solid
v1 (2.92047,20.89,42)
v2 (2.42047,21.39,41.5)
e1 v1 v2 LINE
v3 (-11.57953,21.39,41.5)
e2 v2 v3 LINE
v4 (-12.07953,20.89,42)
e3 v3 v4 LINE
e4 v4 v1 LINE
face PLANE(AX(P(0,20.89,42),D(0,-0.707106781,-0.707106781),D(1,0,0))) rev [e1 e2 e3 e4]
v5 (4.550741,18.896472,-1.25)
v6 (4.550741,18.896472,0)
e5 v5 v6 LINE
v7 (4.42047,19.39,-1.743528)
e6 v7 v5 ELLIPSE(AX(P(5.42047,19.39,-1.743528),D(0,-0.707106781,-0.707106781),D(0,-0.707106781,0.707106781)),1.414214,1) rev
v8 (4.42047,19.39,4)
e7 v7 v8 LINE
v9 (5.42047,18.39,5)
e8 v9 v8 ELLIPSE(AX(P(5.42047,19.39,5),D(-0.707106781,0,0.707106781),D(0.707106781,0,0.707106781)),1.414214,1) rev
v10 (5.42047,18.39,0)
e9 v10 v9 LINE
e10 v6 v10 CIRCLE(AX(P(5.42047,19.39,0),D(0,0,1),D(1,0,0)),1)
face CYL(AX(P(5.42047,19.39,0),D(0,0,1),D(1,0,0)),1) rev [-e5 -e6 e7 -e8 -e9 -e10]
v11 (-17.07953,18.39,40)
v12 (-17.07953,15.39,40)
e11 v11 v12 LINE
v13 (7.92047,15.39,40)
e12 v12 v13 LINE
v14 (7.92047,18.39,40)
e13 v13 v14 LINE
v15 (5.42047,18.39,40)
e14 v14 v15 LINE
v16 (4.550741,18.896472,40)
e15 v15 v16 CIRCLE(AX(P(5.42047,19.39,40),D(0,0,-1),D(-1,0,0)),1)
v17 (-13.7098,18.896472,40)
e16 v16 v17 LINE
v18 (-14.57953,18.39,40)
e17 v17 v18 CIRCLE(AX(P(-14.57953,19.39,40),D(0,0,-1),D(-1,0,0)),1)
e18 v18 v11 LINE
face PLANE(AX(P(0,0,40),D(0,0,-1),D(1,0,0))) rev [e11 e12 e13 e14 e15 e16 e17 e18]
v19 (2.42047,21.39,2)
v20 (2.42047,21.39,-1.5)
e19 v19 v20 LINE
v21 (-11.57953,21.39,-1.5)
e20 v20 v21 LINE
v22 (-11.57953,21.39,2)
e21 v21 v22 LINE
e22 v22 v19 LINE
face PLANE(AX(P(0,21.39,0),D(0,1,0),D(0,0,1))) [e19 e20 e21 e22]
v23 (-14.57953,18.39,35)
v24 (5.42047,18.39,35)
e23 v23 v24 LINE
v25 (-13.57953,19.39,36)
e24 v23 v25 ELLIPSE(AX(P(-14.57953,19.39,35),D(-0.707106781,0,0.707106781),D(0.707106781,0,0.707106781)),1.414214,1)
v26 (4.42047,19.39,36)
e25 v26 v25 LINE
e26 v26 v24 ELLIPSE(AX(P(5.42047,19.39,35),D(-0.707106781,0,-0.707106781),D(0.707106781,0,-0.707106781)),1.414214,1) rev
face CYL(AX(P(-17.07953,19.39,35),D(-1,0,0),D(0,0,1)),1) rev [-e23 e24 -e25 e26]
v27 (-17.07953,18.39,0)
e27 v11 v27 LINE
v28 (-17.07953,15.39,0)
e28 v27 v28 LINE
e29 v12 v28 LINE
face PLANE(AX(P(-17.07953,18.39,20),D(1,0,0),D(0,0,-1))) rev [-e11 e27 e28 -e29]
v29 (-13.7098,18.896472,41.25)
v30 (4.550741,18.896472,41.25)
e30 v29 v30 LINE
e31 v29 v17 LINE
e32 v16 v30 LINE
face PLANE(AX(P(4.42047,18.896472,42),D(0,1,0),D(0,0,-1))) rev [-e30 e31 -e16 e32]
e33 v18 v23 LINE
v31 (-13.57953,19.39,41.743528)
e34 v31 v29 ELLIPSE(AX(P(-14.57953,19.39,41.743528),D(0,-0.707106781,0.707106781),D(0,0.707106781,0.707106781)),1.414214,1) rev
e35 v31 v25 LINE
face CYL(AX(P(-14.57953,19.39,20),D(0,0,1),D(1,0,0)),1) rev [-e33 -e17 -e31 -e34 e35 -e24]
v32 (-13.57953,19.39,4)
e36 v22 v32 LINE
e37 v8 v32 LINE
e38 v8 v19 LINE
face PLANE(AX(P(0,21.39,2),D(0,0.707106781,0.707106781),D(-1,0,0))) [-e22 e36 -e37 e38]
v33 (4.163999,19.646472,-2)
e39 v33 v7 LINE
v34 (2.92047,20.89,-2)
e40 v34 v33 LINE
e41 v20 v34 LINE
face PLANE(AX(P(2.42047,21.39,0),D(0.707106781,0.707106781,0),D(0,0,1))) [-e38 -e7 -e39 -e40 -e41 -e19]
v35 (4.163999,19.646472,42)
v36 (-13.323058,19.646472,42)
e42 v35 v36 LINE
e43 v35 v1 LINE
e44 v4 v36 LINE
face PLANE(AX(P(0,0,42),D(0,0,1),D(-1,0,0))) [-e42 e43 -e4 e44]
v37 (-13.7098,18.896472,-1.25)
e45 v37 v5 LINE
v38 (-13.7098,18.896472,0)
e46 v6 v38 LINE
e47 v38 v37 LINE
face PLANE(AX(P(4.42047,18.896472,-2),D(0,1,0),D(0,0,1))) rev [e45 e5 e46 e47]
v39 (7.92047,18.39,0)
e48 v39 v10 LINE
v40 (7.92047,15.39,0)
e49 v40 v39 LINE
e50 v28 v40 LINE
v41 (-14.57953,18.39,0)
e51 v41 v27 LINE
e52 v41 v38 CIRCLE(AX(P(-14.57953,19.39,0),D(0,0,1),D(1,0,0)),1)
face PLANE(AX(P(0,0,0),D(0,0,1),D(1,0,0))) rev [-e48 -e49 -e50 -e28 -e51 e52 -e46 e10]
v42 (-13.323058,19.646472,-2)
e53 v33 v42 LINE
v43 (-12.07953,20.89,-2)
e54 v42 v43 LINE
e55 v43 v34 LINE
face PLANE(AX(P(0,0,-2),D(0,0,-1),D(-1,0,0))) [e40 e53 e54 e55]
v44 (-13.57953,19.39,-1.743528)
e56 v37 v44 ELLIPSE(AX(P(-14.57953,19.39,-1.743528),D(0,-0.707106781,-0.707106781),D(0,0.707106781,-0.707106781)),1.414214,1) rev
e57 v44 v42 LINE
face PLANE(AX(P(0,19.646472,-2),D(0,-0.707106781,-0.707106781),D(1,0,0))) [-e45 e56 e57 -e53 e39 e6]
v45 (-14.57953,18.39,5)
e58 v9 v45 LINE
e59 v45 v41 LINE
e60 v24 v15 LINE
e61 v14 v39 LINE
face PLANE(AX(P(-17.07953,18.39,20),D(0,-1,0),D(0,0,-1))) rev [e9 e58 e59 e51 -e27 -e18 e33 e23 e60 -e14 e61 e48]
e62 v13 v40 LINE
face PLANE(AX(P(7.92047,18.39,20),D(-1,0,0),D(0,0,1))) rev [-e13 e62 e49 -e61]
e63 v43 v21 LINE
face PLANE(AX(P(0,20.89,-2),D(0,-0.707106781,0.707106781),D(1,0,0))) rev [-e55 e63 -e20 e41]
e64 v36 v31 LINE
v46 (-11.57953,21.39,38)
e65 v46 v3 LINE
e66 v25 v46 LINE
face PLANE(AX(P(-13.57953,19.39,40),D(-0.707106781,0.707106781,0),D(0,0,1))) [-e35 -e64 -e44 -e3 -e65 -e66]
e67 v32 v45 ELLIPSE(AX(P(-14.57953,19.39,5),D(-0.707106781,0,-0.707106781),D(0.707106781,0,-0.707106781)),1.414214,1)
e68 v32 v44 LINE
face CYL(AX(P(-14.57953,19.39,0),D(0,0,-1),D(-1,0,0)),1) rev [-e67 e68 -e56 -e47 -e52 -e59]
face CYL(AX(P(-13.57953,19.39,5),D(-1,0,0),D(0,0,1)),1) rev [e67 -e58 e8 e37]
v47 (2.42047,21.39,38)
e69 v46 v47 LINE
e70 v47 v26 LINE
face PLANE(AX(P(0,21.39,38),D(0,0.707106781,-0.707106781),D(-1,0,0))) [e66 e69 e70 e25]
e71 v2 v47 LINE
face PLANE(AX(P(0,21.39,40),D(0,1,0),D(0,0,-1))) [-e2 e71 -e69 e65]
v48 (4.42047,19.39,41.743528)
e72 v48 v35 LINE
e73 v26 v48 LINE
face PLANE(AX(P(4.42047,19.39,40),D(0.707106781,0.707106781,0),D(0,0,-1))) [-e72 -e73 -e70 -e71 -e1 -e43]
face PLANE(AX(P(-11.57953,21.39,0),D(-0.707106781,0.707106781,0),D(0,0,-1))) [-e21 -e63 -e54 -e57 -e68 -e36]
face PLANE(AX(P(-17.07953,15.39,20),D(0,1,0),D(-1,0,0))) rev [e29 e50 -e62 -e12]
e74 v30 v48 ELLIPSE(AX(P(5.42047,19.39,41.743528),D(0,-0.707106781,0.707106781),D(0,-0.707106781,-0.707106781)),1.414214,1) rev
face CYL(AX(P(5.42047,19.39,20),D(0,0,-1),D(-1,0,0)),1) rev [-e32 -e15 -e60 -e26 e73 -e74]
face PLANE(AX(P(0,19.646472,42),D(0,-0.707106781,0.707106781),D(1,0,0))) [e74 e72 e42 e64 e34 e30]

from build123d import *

# Parameters (mm, degrees)
SKETCH_1_W      = 25
SKETCH_1_H      = 3
EXTRUDE_1_DEPTH = 20
SKETCH_2_W      = 18
SKETCH_2_H      = 4
EXTRUDE_2_DEPTH = 3
EXTRUDE_3_DEPTH = 2
CHAMFER_1_SIZE  = 0.75
CHAMFER_2_SIZE  = 0.5
CHAMFER_3_SIZE  = 2
CHAMFER1_SIZE   = 2
FILLET1_R       = 1


with BuildPart() as part:
    # Эскиз1 → Бобышка-Вытянуть1 (new body)
    with BuildSketch(Plane.XY):
        with Locations((-4.579529598, 16.89)):
            Rectangle(SKETCH_1_W, SKETCH_1_H)
    extrude(amount=EXTRUDE_1_DEPTH)

    # Эскиз2 → Бобышка-Вытянуть2 (add)
    with BuildSketch(Plane(origin=(0, 18.39, 0), x_dir=(1, 0, 0), z_dir=(0, 1, 0))):
        with Locations((-4.579529598, -2)):
            Rectangle(SKETCH_2_W, SKETCH_2_H)
    extrude(amount=EXTRUDE_2_DEPTH)

    # Эскиз3 → Бобышка-Вытянуть3 (add)
    with BuildSketch(Plane(origin=(0, 0, 0), x_dir=(-1, 0, 0), z_dir=(0, 0, -1))):
        Polygon((-4.420470402, 21.39), (13.579529598, 21.39), (13.579529598, 19.89), (13.579529598, 18.896471803), (-4.420470402, 18.896471803), (-4.420470402, 19.89), align=None)
    extrude(amount=EXTRUDE_3_DEPTH)

    # Фаска1
    chamfer_1_edges = [part.edges().sort_by_distance(p)[0] for p in [
        (-4.579529598, 18.896471803, -2),
    ]]
    chamfer(chamfer_1_edges, length=CHAMFER_1_SIZE)

    # Фаска2
    chamfer_2_edges = [part.edges().sort_by_distance(p)[0] for p in [
        (-4.579529598, 21.39, -2),
    ]]
    chamfer(chamfer_2_edges, length=CHAMFER_2_SIZE)

    # Фаска3
    chamfer_3_edges = [part.edges().sort_by_distance(p)[0] for p in [
        (-4.579529598, 21.39, 4),
    ]]
    chamfer(chamfer_3_edges, length=CHAMFER_3_SIZE)

    # Зеркальное отражение1: part across plane


with BuildPart() as part_1:
    add(part.part)
    add(part.part.mirror(Plane.XY.offset(20)))

    # Chamfer1
    chamfer1_edges = [part_1.edges().sort_by_distance(p)[0] for p in [
        (4.420470402, 21.39, 39.75),
        (-13.579529598, 21.39, 39.75),
        (4.420470402, 21.39, 0.25),
        (-13.579529598, 21.39, 0.25),
    ]]
    chamfer(chamfer1_edges, length=CHAMFER1_SIZE)

    # Fillet1
    # the kernel refuses this fillet: 1 mm, written as the material it adds along each edge
    with BuildSketch(Plane(origin=(-13.579529598, 18.39, 6.5), x_dir=(-1, 0, 0), z_dir=(0, 0, -1))) as fillet1_piece_1_section:
        with BuildLine():
            CenterArc((FILLET1_R, FILLET1_R), FILLET1_R, 180, 90)
            Line((0, FILLET1_R), (0, 0))
            Line((0, 0), (FILLET1_R, 0))
        make_face()
    fillet1_piece_1 = extrude(amount=6.5, mode=Mode.PRIVATE)
    fillet1_piece_1 = split(fillet1_piece_1, bisect_by=Plane(origin=(-13.579529598, 17.64, 5.75), z_dir=(0, -0.7071067811865476, -0.7071067811865476)), keep=Keep.TOP, mode=Mode.PRIVATE)
    fillet1_piece_1 = fillet1_piece_1 - Plane(origin=(-13.579529598, 19.39, 5), x_dir=(0, 0, -1), z_dir=(1, 0, 0)) * Cylinder(1, 17, mode=Mode.PRIVATE)
    add(fillet1_piece_1)
    with BuildSketch(Plane(origin=(-13.579529598, 18.39, 6.5), x_dir=(-1, 0, 0), z_dir=(0, 0, -1))) as fillet1_piece_2_section:
        with BuildLine():
            CenterArc((FILLET1_R, FILLET1_R), FILLET1_R, 180, 90)
            Line((0, FILLET1_R), (0, 0))
            Line((0, 0), (FILLET1_R, 0))
        make_face()
    fillet1_piece_2 = extrude(amount=9, mode=Mode.PRIVATE)
    fillet1_piece_2 = split(fillet1_piece_2, bisect_by=Plane(origin=(-13.579529598, 14.768235901, 2.878235901), z_dir=(0, 0.7071067811865476, 0.7071067811865476)), keep=Keep.TOP, mode=Mode.PRIVATE)
    fillet1_piece_2 = split(fillet1_piece_2, bisect_by=Plane(origin=(-13.579529598, 18.896471803, 6.5), z_dir=(0, 1, 0)), keep=Keep.TOP, mode=Mode.PRIVATE)
    fillet1_piece_2 = split(fillet1_piece_2, bisect_by=Plane(origin=(-13.579529598, 18.39, 0), z_dir=(0, 0, -1)), keep=Keep.TOP, mode=Mode.PRIVATE)
    add(fillet1_piece_2)
    with BuildSketch(Plane(origin=(6.920470402, 18.39, 4), x_dir=(0, 1, 0), z_dir=(-1, 0, 0))) as fillet1_piece_3_section:
        with BuildLine():
            CenterArc((FILLET1_R, -FILLET1_R), FILLET1_R, 90, 90)
            Line((0, -FILLET1_R), (0, 0))
            Line((0, 0), (FILLET1_R, 0))
        make_face()
    fillet1_piece_3 = extrude(amount=23, mode=Mode.PRIVATE)
    fillet1_piece_3 = split(fillet1_piece_3, bisect_by=Plane(origin=(6.170470402, 17.64, 4), z_dir=(-0.7071067811865476, -0.7071067811865476, 0)), keep=Keep.TOP, mode=Mode.PRIVATE)
    fillet1_piece_3 = split(fillet1_piece_3, bisect_by=Plane(origin=(-3.829529598, 29.14, 4), z_dir=(0.7071067811865476, -0.7071067811865476, 0)), keep=Keep.TOP, mode=Mode.PRIVATE)
    fillet1_piece_3 = fillet1_piece_3 - Plane(origin=(-14.579529598, 19.39, 4), x_dir=(0, -1, 0), z_dir=(0, 0, 1)) * Cylinder(1, 50, mode=Mode.PRIVATE)
    fillet1_piece_3 = fillet1_piece_3 - Plane(origin=(5.420470402, 19.39, 4), x_dir=(-1, 0, 0), z_dir=(0, 0, -1)) * Cylinder(1, 50, mode=Mode.PRIVATE)
    add(fillet1_piece_3)
    with BuildSketch(Plane(origin=(4.420470402, 18.39, -2.5), x_dir=(0, 1, 0), z_dir=(0, 0, 1))) as fillet1_piece_4_section:
        with BuildLine():
            CenterArc((FILLET1_R, -FILLET1_R), FILLET1_R, 90, 90)
            Line((0, -FILLET1_R), (0, 0))
            Line((0, 0), (FILLET1_R, 0))
        make_face()
    fillet1_piece_4 = extrude(amount=9, mode=Mode.PRIVATE)
    fillet1_piece_4 = split(fillet1_piece_4, bisect_by=Plane(origin=(4.420470402, 19.268235901, -1.621764099), z_dir=(0, 0.7071067811865476, 0.7071067811865476)), keep=Keep.TOP, mode=Mode.PRIVATE)
    fillet1_piece_4 = split(fillet1_piece_4, bisect_by=Plane(origin=(4.420470402, 18.896471803, -2.5), z_dir=(0, 1, 0)), keep=Keep.TOP, mode=Mode.PRIVATE)
    fillet1_piece_4 = split(fillet1_piece_4, bisect_by=Plane(origin=(4.420470402, 22.14, 1.25), z_dir=(0, -0.7071067811865476, -0.7071067811865476)), keep=Keep.TOP, mode=Mode.PRIVATE)
    fillet1_piece_4 = fillet1_piece_4 - Plane(origin=(4.420470402, 19.39, 5), x_dir=(0, 0, -1), z_dir=(1, 0, 0)) * Cylinder(1, 22, mode=Mode.PRIVATE)
    add(fillet1_piece_4)
    with BuildSketch(Plane(origin=(4.420470402, 18.39, 0), x_dir=(0, 1, 0), z_dir=(0, 0, 1))) as fillet1_piece_5_section:
        with BuildLine():
            CenterArc((FILLET1_R, -FILLET1_R), FILLET1_R, 90, 90)
            Line((0, -FILLET1_R), (0, 0))
            Line((0, 0), (FILLET1_R, 0))
        make_face()
    fillet1_piece_5 = extrude(amount=6.5, mode=Mode.PRIVATE)
    fillet1_piece_5 = split(fillet1_piece_5, bisect_by=Plane(origin=(4.420470402, 20.89, 2.5), z_dir=(0, -0.7071067811865476, -0.7071067811865476)), keep=Keep.TOP, mode=Mode.PRIVATE)
    fillet1_piece_5 = fillet1_piece_5 - Plane(origin=(4.420470402, 19.39, 5), x_dir=(0, 0, -1), z_dir=(1, 0, 0)) * Cylinder(1, 17, mode=Mode.PRIVATE)
    add(fillet1_piece_5)
    with BuildSketch(Plane(origin=(-13.579529598, 18.39, 33.5), x_dir=(-1, 0, 0), z_dir=(0, 0, 1))) as fillet1_piece_6_section:
        with BuildLine():
            CenterArc((FILLET1_R, -FILLET1_R), FILLET1_R, 90, 90)
            Line((0, -FILLET1_R), (0, 0))
            Line((0, 0), (FILLET1_R, 0))
        make_face()
    fillet1_piece_6 = extrude(amount=6.5, mode=Mode.PRIVATE)
    fillet1_piece_6 = split(fillet1_piece_6, bisect_by=Plane(origin=(-13.579529598, 17.64, 34.25), z_dir=(0, -0.7071067811865476, 0.7071067811865476)), keep=Keep.TOP, mode=Mode.PRIVATE)
    fillet1_piece_6 = fillet1_piece_6 - Plane(origin=(-13.579529598, 19.39, 35), x_dir=(0, -1, 0), z_dir=(1, 0, 0)) * Cylinder(1, 17, mode=Mode.PRIVATE)
    add(fillet1_piece_6)
    with BuildSketch(Plane(origin=(-13.579529598, 18.39, 36), x_dir=(-1, 0, 0), z_dir=(0, 0, 1))) as fillet1_piece_7_section:
        with BuildLine():
            CenterArc((FILLET1_R, -FILLET1_R), FILLET1_R, 90, 90)
            Line((0, -FILLET1_R), (0, 0))
            Line((0, 0), (FILLET1_R, 0))
        make_face()
    fillet1_piece_7 = extrude(amount=6.5, mode=Mode.PRIVATE)
    fillet1_piece_7 = split(fillet1_piece_7, bisect_by=Plane(origin=(-13.579529598, 18.896471803, 36), z_dir=(0, 1, 0)), keep=Keep.TOP, mode=Mode.PRIVATE)
    fillet1_piece_7 = split(fillet1_piece_7, bisect_by=Plane(origin=(-13.579529598, 16.018235901, 38.371764099), z_dir=(0, 0.7071067811865476, -0.7071067811865476)), keep=Keep.TOP, mode=Mode.PRIVATE)
    add(fillet1_piece_7)
    with BuildSketch(Plane(origin=(6.920470402, 18.39, 36), x_dir=(0, 0, -1), z_dir=(-1, 0, 0))) as fillet1_piece_8_section:
        with BuildLine():
            CenterArc((FILLET1_R, -FILLET1_R), FILLET1_R, 90, 90)
            Line((0, -FILLET1_R), (0, 0))
            Line((0, 0), (FILLET1_R, 0))
        make_face()
    fillet1_piece_8 = extrude(amount=23, mode=Mode.PRIVATE)
    fillet1_piece_8 = split(fillet1_piece_8, bisect_by=Plane(origin=(-3.829529598, 29.14, 36), z_dir=(0.7071067811865476, -0.7071067811865476, 0)), keep=Keep.TOP, mode=Mode.PRIVATE)
    fillet1_piece_8 = split(fillet1_piece_8, bisect_by=Plane(origin=(6.170470402, 17.64, 36), z_dir=(-0.7071067811865476, -0.7071067811865476, 0)), keep=Keep.TOP, mode=Mode.PRIVATE)
    fillet1_piece_8 = fillet1_piece_8 - Plane(origin=(-14.579529598, 19.39, 36), x_dir=(0, -1, 0), z_dir=(0, 0, -1)) * Cylinder(1, 50, mode=Mode.PRIVATE)
    fillet1_piece_8 = fillet1_piece_8 - Plane(origin=(5.420470402, 19.39, 36), x_dir=(0, -1, 0), z_dir=(0, 0, 1)) * Cylinder(1, 50, mode=Mode.PRIVATE)
    add(fillet1_piece_8)
    with BuildSketch(Plane(origin=(4.420470402, 18.39, 42.5), x_dir=(1, 0, 0), z_dir=(0, 0, -1))) as fillet1_piece_9_section:
        with BuildLine():
            CenterArc((FILLET1_R, -FILLET1_R), FILLET1_R, 90, 90)
            Line((0, -FILLET1_R), (0, 0))
            Line((0, 0), (FILLET1_R, 0))
        make_face()
    fillet1_piece_9 = extrude(amount=9, mode=Mode.PRIVATE)
    fillet1_piece_9 = split(fillet1_piece_9, bisect_by=Plane(origin=(4.420470402, 18.896471803, 42.5), z_dir=(0, 1, 0)), keep=Keep.TOP, mode=Mode.PRIVATE)
    fillet1_piece_9 = split(fillet1_piece_9, bisect_by=Plane(origin=(4.420470402, 19.268235901, 41.621764099), z_dir=(0, 0.7071067811865476, -0.7071067811865476)), keep=Keep.TOP, mode=Mode.PRIVATE)
    fillet1_piece_9 = split(fillet1_piece_9, bisect_by=Plane(origin=(4.420470402, 22.14, 38.75), z_dir=(0, -0.7071067811865476, 0.7071067811865476)), keep=Keep.TOP, mode=Mode.PRIVATE)
    fillet1_piece_9 = fillet1_piece_9 - Plane(origin=(4.420470402, 19.39, 35), x_dir=(0, -1, 0), z_dir=(1, 0, 0)) * Cylinder(1, 22, mode=Mode.PRIVATE)
    add(fillet1_piece_9)
    with BuildSketch(Plane(origin=(4.420470402, 18.39, 40), x_dir=(1, 0, 0), z_dir=(0, 0, -1))) as fillet1_piece_10_section:
        with BuildLine():
            CenterArc((FILLET1_R, -FILLET1_R), FILLET1_R, 90, 90)
            Line((0, -FILLET1_R), (0, 0))
            Line((0, 0), (FILLET1_R, 0))
        make_face()
    fillet1_piece_10 = extrude(amount=6.5, mode=Mode.PRIVATE)
    fillet1_piece_10 = split(fillet1_piece_10, bisect_by=Plane(origin=(4.420470402, 20.89, 37.5), z_dir=(0, -0.7071067811865476, 0.7071067811865476)), keep=Keep.TOP, mode=Mode.PRIVATE)
    fillet1_piece_10 = fillet1_piece_10 - Plane(origin=(4.420470402, 19.39, 35), x_dir=(0, -1, 0), z_dir=(1, 0, 0)) * Cylinder(1, 17, mode=Mode.PRIVATE)
    add(fillet1_piece_10)


solid = part_1.part
